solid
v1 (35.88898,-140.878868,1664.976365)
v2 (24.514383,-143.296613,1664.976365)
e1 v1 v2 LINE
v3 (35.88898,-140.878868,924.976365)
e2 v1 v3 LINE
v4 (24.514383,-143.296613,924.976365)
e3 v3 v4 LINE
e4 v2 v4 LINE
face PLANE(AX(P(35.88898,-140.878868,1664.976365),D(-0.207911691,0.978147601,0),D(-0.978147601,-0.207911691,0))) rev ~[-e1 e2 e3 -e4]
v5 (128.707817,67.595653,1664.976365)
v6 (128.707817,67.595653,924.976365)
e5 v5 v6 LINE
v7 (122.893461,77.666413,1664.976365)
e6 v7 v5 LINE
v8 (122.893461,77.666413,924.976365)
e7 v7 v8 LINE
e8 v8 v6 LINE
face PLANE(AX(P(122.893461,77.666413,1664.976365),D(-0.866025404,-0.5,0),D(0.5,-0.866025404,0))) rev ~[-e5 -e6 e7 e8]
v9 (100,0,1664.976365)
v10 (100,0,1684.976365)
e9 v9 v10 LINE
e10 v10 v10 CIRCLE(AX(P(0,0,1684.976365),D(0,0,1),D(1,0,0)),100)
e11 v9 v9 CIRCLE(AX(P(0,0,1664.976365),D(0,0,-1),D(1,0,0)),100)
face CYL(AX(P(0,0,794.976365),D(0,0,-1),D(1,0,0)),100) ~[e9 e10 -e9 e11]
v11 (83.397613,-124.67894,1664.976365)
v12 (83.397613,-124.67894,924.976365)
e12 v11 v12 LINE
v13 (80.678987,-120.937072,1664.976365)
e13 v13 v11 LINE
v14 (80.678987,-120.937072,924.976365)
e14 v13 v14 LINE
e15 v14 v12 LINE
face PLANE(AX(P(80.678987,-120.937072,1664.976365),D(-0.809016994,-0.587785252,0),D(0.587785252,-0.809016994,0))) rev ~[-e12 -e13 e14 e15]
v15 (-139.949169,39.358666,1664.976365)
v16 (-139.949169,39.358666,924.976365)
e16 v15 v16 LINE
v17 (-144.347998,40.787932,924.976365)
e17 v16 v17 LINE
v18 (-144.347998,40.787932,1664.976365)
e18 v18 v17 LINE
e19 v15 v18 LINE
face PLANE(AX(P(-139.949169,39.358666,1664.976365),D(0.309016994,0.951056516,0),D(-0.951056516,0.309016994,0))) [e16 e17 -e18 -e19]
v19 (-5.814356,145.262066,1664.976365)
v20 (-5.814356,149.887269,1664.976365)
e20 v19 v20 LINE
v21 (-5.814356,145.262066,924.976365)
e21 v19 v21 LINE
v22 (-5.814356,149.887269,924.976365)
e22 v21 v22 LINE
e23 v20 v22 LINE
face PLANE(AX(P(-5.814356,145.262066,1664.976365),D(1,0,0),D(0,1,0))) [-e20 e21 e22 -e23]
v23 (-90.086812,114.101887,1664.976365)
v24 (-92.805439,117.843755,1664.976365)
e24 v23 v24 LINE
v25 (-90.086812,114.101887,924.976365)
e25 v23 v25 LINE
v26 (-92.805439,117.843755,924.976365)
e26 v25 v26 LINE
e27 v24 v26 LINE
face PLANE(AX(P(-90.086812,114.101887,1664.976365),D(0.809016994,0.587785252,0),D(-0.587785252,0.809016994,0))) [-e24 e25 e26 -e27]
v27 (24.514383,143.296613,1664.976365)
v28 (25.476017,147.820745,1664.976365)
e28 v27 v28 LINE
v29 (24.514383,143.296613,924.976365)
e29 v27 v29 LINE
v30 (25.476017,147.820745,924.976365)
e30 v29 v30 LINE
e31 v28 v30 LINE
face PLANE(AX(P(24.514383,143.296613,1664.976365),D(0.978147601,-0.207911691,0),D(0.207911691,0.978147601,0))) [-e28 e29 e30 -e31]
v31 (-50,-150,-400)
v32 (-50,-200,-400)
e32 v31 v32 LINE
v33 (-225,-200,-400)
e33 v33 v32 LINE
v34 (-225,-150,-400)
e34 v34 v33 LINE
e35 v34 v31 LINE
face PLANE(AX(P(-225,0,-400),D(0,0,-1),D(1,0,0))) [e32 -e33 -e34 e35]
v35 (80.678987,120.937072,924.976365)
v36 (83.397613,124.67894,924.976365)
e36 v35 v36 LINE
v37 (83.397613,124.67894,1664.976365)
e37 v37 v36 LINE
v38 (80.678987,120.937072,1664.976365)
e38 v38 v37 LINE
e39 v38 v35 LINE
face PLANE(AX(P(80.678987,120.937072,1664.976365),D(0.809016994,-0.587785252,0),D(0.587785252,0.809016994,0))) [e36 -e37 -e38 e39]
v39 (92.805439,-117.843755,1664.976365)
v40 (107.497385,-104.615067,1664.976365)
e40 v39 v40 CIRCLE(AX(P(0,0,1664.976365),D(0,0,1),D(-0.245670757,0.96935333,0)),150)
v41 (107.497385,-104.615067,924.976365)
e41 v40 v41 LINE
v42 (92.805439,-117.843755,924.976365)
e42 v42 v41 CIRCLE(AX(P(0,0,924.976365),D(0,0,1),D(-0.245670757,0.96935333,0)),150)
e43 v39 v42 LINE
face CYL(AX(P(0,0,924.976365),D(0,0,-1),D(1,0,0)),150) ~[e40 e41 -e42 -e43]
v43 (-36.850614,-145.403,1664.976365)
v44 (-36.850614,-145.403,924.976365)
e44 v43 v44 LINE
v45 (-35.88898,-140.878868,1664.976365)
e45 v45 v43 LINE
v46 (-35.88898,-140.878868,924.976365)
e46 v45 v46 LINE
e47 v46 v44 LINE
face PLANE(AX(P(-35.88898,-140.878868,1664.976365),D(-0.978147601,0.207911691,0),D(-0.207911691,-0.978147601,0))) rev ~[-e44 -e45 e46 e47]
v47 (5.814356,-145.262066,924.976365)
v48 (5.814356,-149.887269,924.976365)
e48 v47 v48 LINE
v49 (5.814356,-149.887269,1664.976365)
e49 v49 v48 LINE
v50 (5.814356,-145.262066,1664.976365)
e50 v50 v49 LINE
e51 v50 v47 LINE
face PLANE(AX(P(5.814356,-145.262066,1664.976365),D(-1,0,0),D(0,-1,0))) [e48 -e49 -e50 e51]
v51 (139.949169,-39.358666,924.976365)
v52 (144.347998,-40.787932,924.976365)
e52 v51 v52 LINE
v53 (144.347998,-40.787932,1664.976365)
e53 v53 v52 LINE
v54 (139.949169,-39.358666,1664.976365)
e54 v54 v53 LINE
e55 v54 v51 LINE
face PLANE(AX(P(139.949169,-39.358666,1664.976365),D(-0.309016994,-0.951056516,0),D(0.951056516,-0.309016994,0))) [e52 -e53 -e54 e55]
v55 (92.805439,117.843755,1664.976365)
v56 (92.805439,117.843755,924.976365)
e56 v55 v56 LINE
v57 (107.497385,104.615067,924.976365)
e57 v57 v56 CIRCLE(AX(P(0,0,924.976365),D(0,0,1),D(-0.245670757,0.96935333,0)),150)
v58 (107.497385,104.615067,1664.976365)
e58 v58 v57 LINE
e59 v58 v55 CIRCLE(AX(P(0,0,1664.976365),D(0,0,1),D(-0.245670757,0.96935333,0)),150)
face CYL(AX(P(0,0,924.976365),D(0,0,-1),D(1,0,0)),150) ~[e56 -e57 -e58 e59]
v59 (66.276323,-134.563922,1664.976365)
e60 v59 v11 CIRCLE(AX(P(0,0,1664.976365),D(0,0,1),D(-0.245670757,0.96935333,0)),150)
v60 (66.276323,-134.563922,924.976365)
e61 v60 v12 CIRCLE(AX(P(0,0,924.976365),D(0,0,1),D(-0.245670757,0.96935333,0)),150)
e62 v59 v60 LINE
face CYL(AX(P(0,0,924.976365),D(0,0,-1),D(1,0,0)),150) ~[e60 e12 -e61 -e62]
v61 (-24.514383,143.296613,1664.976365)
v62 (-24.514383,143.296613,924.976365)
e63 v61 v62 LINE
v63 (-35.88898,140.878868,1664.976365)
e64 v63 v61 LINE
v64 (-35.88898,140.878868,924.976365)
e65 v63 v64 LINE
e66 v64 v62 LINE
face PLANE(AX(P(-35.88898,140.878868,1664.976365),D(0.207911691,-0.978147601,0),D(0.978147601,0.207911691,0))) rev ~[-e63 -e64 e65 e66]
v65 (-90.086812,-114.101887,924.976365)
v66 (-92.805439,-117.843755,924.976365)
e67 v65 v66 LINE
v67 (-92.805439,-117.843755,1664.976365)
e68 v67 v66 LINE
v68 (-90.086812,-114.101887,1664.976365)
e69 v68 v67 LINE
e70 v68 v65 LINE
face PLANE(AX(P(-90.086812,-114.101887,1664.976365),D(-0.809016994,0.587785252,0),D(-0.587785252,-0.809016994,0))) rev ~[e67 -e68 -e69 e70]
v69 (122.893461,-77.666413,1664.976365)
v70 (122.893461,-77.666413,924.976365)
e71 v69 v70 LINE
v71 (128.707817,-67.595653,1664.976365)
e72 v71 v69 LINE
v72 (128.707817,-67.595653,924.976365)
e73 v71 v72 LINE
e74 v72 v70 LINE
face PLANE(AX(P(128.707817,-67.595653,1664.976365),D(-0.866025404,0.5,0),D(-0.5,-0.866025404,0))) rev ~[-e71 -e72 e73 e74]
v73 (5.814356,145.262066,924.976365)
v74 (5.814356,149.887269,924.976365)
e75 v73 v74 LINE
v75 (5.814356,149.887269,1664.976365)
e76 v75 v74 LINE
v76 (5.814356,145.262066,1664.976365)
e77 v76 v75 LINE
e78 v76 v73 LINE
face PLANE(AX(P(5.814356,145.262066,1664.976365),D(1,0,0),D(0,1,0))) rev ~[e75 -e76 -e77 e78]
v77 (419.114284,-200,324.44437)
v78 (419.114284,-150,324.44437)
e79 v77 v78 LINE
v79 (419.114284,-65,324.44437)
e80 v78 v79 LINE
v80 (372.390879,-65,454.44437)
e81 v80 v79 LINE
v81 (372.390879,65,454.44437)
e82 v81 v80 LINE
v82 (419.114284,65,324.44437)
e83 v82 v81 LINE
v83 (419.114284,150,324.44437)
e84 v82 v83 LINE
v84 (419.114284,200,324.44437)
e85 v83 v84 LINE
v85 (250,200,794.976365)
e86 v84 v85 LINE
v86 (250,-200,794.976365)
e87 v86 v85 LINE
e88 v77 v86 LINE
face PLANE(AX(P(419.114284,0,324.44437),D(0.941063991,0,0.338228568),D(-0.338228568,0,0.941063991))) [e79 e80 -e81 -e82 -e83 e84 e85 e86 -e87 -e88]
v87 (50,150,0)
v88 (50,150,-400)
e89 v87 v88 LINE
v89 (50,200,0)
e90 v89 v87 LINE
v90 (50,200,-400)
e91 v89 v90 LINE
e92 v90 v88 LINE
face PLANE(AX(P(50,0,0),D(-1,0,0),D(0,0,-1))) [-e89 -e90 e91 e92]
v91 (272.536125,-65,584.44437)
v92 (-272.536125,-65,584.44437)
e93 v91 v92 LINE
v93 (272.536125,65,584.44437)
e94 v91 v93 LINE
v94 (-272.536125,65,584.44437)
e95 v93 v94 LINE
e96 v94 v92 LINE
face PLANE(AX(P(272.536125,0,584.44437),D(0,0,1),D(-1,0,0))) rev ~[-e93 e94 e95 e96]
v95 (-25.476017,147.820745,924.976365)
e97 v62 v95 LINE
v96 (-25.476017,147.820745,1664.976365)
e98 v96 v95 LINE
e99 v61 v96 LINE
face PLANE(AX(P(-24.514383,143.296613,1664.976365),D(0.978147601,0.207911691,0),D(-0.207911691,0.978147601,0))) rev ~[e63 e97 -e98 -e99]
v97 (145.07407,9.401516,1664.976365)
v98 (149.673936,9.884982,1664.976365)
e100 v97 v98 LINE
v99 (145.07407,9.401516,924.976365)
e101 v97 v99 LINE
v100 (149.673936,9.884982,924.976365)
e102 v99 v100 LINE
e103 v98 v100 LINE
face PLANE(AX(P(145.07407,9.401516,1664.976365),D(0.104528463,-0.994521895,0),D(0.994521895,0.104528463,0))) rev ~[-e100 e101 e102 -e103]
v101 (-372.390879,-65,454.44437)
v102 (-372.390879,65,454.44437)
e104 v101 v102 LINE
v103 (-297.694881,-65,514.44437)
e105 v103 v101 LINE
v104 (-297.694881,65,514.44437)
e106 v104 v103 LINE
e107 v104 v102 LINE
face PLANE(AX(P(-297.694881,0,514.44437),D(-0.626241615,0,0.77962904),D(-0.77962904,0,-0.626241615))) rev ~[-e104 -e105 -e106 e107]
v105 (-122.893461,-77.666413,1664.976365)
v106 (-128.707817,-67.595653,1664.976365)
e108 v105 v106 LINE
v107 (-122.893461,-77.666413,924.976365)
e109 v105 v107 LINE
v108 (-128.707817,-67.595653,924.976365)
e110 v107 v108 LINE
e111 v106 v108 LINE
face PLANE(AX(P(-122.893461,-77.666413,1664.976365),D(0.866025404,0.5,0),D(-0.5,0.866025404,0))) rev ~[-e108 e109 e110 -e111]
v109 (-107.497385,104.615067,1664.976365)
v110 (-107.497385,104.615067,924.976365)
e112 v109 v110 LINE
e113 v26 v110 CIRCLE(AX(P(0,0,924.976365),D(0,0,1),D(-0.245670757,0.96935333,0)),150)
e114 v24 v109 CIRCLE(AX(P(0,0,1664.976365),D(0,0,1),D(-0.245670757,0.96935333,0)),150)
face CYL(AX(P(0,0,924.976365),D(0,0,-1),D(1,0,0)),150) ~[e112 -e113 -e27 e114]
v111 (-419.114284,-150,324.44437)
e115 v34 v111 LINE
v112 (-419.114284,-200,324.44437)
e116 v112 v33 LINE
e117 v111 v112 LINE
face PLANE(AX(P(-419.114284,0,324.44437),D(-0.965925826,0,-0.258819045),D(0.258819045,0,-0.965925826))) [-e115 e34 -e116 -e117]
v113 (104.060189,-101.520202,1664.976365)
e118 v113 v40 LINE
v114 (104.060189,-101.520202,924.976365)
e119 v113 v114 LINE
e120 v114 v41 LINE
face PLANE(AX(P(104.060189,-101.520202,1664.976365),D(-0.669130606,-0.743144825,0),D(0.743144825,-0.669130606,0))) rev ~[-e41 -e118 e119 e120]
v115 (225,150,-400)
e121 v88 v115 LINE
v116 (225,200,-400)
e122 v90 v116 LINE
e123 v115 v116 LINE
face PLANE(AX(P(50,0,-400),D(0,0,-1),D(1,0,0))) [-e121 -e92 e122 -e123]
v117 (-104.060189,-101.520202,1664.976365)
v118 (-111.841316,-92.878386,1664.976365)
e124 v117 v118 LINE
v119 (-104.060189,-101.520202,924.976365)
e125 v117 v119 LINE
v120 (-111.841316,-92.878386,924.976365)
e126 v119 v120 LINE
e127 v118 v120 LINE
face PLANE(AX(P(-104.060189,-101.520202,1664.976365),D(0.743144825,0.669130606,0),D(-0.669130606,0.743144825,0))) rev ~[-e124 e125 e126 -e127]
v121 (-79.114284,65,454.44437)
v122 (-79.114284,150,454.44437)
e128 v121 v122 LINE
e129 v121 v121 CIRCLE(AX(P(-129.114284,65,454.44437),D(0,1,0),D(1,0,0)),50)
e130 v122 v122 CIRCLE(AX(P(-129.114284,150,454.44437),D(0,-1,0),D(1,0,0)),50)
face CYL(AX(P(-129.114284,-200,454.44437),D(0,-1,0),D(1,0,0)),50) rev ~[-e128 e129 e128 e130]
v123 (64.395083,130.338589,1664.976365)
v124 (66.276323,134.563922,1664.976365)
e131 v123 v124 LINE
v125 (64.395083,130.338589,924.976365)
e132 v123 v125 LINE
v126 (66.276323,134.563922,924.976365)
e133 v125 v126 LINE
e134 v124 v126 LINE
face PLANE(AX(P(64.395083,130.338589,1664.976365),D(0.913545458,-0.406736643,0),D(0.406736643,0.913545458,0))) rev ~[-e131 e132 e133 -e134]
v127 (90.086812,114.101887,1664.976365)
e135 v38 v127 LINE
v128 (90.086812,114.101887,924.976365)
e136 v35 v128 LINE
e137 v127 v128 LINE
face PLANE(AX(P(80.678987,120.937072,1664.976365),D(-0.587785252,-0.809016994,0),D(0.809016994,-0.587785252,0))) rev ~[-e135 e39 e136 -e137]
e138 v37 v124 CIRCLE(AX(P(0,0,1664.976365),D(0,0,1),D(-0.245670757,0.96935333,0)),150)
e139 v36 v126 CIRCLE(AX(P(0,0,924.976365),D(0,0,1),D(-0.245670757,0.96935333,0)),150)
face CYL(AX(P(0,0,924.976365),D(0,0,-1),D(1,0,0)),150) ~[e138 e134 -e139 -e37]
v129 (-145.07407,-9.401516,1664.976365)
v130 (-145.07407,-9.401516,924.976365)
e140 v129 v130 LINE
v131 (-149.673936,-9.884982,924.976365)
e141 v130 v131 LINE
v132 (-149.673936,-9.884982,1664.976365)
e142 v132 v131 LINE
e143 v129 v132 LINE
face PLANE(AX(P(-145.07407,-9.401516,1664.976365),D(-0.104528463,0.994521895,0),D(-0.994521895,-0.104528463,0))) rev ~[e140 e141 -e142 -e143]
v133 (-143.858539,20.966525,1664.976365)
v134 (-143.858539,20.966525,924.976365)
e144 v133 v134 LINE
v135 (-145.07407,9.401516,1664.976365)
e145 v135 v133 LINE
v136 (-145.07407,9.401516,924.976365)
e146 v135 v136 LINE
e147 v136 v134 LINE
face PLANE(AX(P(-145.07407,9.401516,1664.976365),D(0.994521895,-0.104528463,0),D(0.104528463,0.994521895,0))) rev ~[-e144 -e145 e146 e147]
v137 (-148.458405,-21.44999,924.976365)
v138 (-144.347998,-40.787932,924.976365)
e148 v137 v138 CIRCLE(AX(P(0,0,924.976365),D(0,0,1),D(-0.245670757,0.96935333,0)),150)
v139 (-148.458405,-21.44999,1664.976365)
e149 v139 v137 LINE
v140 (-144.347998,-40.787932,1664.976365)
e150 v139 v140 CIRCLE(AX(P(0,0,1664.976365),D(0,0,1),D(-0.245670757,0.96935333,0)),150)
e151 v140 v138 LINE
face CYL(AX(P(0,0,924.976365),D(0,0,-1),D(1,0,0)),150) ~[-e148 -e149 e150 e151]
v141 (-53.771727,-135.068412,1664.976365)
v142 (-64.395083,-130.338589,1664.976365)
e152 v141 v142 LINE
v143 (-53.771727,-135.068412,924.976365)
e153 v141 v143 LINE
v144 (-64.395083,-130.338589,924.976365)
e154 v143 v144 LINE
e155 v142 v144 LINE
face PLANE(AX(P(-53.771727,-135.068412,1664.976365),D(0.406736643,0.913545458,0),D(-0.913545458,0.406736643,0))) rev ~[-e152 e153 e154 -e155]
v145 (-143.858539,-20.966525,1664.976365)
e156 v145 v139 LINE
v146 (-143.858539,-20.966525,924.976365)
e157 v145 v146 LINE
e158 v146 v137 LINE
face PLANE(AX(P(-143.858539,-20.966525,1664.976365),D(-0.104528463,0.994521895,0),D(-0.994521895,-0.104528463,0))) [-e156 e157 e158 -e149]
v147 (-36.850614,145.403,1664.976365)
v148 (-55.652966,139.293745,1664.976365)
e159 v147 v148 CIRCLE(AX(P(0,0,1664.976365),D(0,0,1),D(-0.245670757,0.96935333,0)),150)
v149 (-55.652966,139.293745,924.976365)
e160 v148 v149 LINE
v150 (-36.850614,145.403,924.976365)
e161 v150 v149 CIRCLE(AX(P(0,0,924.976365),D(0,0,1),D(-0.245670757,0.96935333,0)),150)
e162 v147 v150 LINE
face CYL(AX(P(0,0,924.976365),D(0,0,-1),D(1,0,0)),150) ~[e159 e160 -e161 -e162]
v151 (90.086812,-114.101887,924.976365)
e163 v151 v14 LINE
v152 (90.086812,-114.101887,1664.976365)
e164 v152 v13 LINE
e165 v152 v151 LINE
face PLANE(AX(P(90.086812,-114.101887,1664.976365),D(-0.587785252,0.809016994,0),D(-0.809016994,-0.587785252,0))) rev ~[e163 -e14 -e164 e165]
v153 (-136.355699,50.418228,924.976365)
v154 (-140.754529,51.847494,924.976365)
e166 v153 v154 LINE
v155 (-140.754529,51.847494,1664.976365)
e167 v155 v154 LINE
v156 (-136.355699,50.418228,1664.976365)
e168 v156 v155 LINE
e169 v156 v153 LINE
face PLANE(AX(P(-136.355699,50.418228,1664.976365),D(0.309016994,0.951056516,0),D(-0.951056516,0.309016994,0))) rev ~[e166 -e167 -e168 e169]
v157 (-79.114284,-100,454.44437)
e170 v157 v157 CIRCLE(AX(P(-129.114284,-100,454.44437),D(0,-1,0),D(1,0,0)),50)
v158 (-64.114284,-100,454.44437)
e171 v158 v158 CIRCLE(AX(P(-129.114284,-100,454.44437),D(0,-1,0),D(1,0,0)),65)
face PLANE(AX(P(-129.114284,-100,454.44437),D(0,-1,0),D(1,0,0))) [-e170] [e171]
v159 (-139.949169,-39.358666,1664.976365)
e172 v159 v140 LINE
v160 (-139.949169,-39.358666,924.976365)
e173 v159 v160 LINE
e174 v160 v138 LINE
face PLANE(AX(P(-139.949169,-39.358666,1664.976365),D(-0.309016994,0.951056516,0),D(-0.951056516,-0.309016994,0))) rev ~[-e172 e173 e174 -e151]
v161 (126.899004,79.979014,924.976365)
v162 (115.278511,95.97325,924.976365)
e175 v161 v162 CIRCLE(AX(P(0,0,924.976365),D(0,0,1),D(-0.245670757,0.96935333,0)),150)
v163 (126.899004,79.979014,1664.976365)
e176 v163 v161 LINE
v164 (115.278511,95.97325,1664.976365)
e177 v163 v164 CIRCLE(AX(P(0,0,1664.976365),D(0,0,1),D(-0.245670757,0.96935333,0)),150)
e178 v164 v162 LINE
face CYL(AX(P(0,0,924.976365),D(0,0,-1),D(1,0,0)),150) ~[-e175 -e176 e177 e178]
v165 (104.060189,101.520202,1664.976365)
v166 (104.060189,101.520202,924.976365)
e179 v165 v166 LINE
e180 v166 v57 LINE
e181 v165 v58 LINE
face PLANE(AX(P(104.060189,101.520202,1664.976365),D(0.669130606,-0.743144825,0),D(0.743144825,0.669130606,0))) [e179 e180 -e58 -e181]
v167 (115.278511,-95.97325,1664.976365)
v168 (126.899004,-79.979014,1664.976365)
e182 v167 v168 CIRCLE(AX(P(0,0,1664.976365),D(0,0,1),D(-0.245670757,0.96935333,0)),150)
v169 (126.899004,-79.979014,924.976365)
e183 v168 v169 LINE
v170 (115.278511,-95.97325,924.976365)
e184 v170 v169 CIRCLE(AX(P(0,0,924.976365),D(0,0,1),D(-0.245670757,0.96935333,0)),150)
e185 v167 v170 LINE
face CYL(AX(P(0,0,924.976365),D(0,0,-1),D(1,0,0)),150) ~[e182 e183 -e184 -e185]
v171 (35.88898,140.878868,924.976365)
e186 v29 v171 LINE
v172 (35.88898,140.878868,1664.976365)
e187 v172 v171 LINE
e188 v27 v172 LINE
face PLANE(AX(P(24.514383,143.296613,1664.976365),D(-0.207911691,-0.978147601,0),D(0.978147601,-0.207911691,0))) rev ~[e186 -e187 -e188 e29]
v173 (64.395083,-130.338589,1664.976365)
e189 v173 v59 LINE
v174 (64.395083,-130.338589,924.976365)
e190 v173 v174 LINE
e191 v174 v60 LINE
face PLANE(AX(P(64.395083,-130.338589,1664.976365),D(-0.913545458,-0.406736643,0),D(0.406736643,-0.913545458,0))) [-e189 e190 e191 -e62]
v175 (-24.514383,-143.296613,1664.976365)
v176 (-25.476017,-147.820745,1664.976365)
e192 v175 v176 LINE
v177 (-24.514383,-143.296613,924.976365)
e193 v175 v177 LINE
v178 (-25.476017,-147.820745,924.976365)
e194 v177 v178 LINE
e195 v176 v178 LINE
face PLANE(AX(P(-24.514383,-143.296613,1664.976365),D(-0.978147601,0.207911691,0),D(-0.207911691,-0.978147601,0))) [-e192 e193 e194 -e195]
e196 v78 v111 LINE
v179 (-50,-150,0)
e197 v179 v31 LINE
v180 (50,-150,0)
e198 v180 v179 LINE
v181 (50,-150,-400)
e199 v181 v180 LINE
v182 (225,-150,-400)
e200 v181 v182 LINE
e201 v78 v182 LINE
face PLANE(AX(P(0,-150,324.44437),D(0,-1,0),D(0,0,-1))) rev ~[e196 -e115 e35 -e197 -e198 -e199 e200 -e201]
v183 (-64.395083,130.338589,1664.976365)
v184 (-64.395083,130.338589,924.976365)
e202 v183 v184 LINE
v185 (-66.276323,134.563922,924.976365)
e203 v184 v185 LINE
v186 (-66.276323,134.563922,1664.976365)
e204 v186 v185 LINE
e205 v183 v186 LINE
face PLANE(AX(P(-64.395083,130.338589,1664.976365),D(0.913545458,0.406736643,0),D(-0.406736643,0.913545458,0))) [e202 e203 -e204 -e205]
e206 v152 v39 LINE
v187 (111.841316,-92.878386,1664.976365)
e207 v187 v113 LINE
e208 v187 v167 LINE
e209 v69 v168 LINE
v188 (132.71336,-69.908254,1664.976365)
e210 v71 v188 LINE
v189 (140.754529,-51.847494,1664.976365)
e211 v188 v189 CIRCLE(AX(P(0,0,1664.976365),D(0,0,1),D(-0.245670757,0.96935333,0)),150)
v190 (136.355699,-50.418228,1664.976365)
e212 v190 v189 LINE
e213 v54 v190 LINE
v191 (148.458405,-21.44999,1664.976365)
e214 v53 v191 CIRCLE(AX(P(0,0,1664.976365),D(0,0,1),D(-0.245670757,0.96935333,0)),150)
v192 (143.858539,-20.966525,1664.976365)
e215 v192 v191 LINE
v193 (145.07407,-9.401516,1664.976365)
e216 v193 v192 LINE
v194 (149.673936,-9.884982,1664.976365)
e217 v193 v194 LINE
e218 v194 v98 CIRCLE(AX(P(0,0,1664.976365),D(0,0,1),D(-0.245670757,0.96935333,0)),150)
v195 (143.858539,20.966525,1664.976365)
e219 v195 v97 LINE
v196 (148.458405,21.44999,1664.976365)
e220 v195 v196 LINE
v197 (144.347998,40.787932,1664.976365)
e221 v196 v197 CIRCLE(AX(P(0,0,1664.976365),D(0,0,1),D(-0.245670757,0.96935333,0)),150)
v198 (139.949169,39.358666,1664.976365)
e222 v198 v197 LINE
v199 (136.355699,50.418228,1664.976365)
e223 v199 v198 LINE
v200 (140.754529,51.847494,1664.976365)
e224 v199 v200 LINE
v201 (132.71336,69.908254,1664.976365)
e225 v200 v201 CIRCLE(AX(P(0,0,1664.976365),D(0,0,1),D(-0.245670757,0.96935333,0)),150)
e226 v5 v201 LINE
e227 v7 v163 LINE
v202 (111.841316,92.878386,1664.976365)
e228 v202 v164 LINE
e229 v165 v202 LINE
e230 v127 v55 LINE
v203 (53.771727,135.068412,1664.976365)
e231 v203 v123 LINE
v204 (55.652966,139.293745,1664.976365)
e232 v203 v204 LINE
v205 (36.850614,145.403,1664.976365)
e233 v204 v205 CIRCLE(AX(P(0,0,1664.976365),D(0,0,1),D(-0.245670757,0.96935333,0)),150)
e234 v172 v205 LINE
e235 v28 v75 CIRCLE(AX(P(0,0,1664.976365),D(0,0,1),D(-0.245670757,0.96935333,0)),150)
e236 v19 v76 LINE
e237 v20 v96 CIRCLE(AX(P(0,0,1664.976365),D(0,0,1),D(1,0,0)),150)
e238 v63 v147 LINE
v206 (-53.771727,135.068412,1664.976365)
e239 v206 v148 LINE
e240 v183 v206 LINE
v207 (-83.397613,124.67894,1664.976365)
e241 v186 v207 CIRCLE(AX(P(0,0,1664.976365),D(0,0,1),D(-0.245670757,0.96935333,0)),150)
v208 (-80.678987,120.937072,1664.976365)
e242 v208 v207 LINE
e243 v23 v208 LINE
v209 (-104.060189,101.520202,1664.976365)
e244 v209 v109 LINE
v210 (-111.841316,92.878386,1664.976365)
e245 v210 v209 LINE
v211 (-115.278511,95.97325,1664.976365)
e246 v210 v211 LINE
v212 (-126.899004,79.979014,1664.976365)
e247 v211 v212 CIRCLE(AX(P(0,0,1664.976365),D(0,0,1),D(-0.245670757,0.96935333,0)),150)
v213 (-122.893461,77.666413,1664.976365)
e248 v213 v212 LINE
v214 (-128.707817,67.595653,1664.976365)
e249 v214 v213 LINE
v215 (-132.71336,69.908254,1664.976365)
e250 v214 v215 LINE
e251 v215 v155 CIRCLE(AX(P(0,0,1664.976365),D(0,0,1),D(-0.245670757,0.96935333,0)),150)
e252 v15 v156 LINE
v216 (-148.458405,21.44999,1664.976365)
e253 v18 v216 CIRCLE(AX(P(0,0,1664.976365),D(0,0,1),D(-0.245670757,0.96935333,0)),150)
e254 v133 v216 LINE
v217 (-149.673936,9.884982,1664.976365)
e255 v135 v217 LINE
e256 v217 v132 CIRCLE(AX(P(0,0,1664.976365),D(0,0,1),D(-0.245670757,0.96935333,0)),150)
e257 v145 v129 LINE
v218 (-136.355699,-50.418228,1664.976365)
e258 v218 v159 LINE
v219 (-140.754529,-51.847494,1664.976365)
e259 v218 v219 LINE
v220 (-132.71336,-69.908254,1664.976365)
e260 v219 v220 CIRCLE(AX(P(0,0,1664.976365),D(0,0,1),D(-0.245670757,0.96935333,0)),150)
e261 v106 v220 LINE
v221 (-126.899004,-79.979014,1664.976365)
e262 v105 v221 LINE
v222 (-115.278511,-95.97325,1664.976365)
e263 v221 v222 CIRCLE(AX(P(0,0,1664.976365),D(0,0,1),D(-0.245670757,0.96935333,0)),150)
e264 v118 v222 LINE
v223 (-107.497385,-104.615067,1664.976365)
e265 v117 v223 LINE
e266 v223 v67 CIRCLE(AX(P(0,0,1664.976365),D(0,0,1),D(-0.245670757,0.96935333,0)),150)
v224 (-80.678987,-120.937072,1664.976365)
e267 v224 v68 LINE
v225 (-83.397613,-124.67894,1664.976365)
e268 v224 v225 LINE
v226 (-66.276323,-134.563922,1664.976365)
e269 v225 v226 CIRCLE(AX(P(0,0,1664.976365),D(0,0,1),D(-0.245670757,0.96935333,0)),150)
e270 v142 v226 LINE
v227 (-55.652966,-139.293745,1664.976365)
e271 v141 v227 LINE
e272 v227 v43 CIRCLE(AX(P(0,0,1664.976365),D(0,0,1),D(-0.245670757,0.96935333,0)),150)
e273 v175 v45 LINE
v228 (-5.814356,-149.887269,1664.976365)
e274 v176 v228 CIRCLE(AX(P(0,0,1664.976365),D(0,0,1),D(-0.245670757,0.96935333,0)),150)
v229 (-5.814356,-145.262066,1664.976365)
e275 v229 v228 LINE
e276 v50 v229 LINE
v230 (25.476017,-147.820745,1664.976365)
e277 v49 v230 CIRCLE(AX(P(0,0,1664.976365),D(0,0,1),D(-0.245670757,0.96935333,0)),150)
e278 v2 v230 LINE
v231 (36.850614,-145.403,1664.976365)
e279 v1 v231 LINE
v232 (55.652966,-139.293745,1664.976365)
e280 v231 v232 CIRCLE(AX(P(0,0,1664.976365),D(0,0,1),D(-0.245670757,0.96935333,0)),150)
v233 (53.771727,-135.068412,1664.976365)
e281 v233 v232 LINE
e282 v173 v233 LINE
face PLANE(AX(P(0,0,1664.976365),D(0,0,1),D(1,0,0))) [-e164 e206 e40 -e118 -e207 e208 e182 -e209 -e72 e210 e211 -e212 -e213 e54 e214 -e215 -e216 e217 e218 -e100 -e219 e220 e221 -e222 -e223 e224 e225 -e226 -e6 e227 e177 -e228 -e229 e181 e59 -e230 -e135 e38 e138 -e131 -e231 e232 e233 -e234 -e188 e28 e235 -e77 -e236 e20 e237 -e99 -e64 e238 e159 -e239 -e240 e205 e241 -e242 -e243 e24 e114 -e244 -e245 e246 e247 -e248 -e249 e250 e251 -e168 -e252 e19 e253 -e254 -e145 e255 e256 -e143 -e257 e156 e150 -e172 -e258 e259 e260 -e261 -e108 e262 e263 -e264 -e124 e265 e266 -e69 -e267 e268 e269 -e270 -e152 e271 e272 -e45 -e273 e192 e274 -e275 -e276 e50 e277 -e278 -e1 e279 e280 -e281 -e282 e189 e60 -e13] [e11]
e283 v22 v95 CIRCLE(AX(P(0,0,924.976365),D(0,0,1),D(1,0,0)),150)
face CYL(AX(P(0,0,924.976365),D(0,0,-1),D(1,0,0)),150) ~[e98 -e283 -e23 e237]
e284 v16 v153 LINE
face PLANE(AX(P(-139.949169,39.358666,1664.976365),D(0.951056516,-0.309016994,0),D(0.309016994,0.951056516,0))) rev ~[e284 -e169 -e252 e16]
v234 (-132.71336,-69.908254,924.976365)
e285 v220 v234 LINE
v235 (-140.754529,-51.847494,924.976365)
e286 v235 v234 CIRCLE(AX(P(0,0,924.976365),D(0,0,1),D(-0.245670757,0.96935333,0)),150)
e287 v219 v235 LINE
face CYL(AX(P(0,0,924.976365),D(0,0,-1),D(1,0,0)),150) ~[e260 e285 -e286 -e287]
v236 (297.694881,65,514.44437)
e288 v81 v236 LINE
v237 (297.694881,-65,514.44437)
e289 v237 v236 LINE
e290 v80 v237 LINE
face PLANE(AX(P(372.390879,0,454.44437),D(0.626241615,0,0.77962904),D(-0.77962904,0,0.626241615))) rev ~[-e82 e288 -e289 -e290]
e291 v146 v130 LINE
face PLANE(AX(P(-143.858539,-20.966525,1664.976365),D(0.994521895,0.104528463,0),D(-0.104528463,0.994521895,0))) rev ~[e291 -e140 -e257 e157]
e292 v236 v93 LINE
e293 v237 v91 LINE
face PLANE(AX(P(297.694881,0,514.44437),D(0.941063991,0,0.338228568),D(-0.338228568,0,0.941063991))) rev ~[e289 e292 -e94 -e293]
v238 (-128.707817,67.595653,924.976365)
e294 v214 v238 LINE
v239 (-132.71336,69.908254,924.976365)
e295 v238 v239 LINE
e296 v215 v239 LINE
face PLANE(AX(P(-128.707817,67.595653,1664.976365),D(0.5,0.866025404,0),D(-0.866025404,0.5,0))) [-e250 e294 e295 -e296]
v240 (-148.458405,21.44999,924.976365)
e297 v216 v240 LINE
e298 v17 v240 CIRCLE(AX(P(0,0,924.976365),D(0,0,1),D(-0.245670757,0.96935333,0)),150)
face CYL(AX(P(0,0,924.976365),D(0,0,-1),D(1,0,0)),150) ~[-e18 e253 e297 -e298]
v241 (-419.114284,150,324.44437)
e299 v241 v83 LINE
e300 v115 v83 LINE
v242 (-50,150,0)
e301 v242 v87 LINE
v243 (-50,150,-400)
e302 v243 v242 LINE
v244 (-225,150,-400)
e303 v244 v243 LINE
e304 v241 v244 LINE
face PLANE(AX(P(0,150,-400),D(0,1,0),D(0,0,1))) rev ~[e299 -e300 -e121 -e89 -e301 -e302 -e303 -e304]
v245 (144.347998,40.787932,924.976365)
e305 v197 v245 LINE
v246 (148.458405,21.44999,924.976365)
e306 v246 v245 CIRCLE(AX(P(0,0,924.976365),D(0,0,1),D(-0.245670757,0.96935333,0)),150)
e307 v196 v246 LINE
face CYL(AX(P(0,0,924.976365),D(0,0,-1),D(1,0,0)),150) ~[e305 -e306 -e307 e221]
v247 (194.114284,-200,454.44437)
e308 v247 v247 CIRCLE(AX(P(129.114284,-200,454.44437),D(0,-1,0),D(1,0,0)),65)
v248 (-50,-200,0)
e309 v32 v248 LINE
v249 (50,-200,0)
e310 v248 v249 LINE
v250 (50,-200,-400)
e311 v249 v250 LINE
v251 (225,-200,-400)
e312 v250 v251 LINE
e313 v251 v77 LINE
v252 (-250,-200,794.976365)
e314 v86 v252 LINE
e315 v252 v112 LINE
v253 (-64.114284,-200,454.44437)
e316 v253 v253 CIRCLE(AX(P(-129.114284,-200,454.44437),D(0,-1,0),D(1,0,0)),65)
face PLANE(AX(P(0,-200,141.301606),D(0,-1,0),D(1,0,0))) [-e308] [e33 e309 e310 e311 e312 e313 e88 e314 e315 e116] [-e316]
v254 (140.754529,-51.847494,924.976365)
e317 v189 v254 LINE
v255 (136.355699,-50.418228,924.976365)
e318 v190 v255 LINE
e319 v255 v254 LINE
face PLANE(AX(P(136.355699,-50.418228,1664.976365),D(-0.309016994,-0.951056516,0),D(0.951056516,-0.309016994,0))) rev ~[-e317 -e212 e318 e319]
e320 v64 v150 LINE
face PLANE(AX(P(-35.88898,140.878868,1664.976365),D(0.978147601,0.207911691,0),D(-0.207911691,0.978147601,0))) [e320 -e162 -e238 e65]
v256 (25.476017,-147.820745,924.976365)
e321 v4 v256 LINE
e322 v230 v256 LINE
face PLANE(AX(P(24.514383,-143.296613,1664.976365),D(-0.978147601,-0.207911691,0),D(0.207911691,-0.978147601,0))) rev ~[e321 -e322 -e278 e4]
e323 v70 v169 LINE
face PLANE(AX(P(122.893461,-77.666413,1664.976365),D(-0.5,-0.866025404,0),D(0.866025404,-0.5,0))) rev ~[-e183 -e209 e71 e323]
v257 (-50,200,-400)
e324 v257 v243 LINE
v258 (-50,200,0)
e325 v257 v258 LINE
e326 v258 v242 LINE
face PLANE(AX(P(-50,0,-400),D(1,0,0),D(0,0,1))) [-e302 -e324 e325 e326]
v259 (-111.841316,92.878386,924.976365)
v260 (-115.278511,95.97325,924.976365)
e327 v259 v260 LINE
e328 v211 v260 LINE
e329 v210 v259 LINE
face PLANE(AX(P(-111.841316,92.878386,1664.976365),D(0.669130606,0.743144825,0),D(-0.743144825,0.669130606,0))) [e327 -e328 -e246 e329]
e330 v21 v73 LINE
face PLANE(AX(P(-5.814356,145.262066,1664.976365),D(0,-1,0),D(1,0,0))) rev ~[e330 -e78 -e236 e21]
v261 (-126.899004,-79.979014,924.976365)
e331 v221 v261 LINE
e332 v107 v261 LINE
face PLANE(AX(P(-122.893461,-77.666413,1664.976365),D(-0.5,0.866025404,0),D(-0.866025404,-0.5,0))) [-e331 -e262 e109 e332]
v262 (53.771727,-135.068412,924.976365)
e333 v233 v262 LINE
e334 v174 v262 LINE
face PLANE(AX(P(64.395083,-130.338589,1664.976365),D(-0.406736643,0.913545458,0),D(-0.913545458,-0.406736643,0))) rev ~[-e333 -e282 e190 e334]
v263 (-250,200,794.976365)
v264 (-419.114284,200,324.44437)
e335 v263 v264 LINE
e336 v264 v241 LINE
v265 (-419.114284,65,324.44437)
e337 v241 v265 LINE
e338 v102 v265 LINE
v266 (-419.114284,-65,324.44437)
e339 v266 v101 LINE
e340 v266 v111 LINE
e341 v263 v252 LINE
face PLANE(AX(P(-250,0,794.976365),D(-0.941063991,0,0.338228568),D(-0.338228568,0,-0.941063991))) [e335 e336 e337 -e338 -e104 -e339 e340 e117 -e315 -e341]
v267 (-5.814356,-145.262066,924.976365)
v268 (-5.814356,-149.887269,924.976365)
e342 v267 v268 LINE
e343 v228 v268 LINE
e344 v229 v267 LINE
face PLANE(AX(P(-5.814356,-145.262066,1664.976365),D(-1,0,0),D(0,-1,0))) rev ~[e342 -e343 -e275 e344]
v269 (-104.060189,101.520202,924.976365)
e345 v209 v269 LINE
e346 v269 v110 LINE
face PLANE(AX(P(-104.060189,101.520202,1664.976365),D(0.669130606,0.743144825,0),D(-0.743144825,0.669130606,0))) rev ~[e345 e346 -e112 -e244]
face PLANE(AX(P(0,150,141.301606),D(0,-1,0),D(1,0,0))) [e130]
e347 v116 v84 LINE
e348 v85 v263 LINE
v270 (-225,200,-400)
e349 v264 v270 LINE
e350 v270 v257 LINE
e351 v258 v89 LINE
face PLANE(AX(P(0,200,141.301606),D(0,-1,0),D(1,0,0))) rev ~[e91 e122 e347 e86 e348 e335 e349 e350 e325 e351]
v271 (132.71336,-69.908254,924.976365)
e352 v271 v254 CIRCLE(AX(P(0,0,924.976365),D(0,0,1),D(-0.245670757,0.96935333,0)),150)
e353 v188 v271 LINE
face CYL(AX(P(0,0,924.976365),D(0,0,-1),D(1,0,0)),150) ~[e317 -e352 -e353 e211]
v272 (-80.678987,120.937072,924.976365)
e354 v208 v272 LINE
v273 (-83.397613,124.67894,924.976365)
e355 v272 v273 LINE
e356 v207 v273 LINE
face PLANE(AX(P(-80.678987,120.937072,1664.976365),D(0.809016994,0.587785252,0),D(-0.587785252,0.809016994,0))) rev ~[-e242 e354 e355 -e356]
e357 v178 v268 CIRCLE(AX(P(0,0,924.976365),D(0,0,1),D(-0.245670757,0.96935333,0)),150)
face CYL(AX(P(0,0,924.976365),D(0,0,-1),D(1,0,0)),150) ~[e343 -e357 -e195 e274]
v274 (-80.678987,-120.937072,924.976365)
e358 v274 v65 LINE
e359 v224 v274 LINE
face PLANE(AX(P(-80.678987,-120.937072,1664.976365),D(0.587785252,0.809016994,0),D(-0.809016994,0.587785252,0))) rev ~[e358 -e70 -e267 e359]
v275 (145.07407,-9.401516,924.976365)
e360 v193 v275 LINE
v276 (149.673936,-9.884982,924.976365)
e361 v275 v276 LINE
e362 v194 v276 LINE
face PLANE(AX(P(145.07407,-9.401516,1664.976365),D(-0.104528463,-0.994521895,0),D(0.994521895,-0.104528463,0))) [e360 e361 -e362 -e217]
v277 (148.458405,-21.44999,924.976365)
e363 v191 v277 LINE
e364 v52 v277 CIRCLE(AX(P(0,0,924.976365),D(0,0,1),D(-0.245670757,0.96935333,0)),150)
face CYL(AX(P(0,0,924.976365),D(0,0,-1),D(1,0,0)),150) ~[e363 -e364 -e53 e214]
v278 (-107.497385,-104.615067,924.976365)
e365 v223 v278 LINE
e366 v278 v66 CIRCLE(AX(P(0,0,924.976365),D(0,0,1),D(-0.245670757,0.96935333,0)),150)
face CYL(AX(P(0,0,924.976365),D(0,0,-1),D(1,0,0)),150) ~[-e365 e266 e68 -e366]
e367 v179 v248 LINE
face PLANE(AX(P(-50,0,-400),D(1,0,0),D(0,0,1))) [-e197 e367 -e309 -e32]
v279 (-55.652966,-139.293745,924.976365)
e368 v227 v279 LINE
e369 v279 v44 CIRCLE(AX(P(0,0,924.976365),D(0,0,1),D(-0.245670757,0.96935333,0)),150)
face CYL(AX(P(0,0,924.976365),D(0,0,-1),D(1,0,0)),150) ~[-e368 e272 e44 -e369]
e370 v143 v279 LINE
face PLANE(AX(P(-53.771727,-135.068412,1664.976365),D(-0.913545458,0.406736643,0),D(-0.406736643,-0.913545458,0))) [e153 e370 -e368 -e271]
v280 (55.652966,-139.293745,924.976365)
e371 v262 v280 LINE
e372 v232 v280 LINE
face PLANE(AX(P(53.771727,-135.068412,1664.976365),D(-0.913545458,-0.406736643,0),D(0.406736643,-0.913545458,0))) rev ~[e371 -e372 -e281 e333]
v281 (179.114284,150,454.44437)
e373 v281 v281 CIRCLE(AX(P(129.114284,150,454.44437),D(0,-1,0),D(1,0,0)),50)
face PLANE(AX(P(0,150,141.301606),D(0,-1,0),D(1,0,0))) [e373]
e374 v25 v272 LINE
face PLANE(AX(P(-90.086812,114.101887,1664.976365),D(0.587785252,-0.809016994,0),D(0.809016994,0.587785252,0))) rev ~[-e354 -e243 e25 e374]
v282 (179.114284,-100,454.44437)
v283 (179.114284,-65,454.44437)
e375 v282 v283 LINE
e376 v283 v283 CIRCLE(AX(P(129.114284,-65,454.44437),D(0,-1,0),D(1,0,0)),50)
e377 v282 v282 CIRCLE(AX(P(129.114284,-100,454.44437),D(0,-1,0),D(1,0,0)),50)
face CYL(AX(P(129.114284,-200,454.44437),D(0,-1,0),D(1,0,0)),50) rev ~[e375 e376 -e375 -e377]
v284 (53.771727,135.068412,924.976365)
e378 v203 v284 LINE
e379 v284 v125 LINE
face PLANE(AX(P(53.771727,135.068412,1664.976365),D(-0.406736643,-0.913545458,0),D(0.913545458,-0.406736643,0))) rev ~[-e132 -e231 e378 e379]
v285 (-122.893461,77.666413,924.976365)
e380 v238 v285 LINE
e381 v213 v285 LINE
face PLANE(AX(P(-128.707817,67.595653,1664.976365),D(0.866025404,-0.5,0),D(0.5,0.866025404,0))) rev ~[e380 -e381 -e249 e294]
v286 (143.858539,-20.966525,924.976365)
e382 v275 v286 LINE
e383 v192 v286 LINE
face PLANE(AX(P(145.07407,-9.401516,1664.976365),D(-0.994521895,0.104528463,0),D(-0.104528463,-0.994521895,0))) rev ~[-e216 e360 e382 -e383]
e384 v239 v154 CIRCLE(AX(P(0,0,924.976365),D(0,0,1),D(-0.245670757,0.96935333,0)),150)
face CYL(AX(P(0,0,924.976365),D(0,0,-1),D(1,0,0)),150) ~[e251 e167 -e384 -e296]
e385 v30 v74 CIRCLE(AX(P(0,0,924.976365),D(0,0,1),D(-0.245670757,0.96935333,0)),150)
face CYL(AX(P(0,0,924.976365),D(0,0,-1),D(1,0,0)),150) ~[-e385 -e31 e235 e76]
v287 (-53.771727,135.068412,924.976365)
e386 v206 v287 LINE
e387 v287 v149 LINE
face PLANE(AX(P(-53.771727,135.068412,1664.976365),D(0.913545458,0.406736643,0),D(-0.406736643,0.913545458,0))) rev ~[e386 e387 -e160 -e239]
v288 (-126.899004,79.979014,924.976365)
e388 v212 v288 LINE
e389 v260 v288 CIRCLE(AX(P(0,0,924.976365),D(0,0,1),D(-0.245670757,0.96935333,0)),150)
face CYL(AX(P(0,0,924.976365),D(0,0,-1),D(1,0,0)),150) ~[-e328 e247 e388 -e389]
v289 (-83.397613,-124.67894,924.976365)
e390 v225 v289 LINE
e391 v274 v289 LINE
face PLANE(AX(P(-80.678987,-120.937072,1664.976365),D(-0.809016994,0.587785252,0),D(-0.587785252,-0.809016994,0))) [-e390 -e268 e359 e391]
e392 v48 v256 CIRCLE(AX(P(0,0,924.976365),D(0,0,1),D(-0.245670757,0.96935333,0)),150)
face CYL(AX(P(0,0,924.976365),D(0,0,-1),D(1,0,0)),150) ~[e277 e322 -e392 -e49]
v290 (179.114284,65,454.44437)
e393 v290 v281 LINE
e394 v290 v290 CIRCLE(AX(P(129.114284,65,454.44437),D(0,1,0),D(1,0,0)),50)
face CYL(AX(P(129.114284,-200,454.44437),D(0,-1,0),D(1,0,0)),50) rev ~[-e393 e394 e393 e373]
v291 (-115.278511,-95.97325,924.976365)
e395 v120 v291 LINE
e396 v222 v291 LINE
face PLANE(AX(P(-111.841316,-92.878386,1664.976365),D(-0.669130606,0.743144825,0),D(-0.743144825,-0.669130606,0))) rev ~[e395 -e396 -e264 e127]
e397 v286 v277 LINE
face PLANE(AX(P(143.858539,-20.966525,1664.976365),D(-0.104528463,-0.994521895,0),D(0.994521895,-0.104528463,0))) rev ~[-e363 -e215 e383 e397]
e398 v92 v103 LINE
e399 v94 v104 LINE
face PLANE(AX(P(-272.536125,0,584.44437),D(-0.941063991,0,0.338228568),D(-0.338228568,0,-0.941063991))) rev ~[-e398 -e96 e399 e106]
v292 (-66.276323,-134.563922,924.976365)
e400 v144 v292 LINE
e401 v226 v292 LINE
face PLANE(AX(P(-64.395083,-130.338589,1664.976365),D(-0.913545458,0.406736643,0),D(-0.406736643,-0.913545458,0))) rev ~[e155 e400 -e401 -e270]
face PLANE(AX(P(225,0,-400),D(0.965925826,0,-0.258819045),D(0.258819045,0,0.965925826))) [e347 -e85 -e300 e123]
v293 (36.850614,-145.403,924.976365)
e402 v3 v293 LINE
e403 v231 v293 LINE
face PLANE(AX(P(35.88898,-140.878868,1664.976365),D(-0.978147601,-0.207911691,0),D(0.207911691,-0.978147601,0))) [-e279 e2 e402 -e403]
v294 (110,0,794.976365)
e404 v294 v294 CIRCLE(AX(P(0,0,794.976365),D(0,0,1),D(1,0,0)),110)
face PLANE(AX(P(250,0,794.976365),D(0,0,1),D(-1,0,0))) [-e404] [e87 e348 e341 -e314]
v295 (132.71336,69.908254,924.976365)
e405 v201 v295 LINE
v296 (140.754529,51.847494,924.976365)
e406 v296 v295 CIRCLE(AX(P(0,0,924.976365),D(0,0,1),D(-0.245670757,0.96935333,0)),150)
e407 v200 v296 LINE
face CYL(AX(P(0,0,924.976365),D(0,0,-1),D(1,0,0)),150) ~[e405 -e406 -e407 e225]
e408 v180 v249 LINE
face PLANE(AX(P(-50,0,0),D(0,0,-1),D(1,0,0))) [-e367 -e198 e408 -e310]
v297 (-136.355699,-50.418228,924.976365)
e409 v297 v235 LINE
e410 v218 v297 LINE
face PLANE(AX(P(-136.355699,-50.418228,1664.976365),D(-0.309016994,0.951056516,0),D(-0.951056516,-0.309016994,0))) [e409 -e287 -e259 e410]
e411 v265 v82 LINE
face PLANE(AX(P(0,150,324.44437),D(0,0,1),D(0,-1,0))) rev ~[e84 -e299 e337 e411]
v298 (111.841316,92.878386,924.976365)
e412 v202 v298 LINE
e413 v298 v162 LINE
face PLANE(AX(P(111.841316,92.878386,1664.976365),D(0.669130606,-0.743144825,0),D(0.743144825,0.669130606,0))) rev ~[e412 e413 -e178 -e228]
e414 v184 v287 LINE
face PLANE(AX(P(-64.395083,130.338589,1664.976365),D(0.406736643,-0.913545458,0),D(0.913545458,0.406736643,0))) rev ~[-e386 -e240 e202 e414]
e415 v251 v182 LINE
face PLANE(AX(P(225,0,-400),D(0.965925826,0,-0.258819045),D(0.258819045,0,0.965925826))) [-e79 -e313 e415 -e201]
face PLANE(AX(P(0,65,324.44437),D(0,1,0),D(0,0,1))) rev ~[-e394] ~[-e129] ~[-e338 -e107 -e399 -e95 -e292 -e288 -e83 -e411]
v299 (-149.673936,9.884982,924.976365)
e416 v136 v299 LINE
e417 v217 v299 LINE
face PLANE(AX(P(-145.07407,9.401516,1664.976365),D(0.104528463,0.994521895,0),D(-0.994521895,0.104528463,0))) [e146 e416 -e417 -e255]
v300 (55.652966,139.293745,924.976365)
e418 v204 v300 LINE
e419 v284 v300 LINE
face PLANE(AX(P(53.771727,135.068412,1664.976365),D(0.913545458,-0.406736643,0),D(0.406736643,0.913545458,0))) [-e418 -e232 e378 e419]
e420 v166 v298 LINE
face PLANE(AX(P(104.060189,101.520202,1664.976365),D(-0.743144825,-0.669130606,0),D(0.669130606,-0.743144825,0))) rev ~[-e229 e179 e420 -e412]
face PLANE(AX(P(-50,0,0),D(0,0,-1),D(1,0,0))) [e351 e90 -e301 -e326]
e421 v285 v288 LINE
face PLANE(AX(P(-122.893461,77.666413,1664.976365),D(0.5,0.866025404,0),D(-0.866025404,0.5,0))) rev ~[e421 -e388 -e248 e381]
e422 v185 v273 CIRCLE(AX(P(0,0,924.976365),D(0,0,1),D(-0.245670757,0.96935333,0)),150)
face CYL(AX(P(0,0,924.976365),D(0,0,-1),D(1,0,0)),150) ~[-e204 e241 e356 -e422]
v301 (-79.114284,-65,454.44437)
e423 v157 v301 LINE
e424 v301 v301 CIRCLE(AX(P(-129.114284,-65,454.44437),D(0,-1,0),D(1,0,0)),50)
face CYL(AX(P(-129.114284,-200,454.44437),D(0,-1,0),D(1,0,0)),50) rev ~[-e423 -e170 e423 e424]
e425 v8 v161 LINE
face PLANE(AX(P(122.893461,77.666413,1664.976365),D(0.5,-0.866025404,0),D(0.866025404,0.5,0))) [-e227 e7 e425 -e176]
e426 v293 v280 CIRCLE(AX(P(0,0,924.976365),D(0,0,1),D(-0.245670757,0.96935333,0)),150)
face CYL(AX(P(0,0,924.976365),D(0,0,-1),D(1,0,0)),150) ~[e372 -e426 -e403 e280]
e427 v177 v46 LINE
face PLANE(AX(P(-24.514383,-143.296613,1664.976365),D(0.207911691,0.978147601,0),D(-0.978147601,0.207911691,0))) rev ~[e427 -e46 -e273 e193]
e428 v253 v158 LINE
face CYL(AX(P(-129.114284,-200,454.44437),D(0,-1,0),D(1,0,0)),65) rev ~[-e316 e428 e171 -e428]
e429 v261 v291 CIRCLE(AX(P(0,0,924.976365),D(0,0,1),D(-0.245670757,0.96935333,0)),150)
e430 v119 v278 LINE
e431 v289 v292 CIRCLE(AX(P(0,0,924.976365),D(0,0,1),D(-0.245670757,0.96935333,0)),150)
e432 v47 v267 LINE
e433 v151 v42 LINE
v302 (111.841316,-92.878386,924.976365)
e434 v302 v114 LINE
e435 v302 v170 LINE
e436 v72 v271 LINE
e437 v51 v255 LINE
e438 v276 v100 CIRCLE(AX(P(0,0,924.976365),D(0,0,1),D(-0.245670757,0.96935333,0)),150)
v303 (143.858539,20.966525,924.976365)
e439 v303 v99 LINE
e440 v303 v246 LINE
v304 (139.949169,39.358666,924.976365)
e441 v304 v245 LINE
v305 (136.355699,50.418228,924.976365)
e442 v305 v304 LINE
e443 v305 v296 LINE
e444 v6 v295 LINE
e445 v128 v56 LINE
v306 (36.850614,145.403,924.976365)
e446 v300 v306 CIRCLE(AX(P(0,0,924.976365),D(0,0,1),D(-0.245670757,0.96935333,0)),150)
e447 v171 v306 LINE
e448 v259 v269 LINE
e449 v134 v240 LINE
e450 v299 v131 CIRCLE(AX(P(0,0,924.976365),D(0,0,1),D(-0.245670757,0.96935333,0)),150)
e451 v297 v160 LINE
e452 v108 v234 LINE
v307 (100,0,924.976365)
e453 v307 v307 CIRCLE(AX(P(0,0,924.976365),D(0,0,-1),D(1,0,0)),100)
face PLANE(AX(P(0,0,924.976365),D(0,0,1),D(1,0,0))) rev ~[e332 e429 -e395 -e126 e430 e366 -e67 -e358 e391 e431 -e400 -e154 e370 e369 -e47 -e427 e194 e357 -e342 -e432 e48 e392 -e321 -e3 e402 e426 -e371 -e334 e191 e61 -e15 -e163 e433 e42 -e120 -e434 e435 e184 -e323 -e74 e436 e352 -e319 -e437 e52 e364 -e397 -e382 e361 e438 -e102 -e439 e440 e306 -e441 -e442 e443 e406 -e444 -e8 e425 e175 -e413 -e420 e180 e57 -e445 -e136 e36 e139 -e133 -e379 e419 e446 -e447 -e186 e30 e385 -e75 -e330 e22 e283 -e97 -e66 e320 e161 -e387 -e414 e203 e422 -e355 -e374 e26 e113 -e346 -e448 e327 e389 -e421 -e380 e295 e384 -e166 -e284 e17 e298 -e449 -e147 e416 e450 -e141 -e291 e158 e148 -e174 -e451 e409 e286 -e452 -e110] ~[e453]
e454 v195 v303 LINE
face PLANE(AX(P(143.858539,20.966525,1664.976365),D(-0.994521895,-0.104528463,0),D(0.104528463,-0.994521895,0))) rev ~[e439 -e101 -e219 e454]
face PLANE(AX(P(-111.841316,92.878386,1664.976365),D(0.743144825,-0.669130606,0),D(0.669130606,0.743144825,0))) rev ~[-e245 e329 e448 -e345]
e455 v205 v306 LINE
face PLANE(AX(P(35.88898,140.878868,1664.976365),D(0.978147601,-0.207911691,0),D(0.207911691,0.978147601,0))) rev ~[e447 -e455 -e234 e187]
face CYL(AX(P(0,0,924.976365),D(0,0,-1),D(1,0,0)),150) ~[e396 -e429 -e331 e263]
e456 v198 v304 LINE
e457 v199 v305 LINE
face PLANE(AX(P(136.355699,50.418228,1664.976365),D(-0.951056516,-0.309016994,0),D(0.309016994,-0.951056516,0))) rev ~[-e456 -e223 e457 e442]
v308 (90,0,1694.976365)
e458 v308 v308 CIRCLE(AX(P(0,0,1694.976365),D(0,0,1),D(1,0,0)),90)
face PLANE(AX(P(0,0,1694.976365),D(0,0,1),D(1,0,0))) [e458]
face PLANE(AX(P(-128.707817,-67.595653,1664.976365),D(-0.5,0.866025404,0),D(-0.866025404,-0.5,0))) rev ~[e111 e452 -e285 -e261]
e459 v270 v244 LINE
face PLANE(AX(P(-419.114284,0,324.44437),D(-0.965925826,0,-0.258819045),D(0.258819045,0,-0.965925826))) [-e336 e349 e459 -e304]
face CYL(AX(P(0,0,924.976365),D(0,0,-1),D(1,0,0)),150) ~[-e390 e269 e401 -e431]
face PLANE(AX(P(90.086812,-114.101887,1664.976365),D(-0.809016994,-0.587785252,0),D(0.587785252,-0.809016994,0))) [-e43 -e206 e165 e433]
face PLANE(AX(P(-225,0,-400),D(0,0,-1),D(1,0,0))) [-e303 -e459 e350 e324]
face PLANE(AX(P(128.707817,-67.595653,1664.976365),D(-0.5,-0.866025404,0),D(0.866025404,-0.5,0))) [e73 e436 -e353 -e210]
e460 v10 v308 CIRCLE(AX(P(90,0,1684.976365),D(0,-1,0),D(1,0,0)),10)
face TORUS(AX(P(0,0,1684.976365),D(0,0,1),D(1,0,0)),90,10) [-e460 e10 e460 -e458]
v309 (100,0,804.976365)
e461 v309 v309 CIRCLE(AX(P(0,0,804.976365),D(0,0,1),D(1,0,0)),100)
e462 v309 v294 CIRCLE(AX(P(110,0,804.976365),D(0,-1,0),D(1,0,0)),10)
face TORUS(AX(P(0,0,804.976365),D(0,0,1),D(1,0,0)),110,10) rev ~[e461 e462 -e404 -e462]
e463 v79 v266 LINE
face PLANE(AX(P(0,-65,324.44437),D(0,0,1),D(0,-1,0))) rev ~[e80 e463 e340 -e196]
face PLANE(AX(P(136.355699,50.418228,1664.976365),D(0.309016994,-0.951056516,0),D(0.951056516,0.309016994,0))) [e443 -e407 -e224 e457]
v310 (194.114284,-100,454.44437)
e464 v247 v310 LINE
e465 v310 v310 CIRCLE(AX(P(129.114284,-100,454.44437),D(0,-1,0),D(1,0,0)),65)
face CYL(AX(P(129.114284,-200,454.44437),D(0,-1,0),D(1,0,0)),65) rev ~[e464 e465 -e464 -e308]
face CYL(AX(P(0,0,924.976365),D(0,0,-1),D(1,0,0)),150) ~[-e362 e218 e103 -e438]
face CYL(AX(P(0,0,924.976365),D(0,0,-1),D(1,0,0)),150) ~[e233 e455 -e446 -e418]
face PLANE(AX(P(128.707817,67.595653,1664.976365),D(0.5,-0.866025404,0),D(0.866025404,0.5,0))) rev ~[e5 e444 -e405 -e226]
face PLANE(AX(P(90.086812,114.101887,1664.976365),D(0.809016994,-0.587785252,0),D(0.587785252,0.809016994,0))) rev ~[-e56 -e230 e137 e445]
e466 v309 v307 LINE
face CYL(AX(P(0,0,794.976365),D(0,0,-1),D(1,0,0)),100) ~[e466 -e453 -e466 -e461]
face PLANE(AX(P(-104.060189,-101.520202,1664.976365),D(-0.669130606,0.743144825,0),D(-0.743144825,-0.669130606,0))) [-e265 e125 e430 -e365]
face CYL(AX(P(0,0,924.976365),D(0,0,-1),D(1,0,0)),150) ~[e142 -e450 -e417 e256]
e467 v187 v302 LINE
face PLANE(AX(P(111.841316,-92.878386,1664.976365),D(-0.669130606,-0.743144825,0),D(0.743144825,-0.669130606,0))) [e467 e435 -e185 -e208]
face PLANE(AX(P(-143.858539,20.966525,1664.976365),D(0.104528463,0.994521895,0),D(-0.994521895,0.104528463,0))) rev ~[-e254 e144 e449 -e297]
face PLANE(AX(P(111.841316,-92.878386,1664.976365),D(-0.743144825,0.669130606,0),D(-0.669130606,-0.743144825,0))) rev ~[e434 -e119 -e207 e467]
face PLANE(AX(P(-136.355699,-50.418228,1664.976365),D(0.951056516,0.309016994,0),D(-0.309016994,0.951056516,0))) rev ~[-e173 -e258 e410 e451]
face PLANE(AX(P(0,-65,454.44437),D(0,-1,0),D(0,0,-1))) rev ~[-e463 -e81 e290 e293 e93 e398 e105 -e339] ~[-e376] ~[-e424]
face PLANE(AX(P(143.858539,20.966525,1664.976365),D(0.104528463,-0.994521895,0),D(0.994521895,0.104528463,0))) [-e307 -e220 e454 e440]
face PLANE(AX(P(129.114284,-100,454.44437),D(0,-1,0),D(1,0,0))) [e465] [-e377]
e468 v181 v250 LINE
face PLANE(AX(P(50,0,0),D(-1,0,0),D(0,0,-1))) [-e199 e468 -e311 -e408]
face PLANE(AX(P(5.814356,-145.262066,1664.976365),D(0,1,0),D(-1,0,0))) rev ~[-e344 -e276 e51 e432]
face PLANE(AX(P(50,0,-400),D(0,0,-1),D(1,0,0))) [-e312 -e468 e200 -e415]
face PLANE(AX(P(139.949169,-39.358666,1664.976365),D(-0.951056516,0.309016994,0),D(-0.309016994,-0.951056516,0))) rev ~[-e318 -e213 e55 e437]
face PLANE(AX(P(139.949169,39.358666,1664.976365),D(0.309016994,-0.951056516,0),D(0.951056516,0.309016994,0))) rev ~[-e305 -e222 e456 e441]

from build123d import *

# Parameters (mm, degrees)
F1_DEPTH         = 200
F2_R             = 100
F3_DEPTH         = 900
F5_R             = 150
F6_DEPTH         = 740
F8_DEPTH         = 580
F9_R             = 65
F9_R_2           = 50
F10_DEPTH        = 100
F11_DEPTH        = 350
F13_DEPTH        = 65
F14_R            = 10
F15_W            = 11.6287115961
F15_H            = 9.4758689404
F16_DEPTH        = 740
F16_COPIES_COUNT = 30


# Not quite as in the source:
# - a pattern or mirror of a feature is missing from the dataset's text; its kind, count and spacing are read off the source's solid


with BuildPart() as f1:
    # F0 (on Front) → F1 (new body, symmetric)
    with BuildSketch(Plane.XZ):
        Polygon((250, 794.9763654469), (-250, 794.9763654469), (-419.1142838269, 324.4443697168), (-225, -400), (-50, -400), (-50, 0), (0, 0), (50, 0), (50, -400), (225, -400), (419.1142838269, 324.4443697168), align=None)
    extrude(amount=F1_DEPTH, both=True)

    # F2 (on face) → F3 (join)
    with BuildSketch(Plane.XY.offset(794.9763654469)):
        Circle(F2_R)
    extrude(amount=F3_DEPTH)

    # F5 (on offset) → F6 (join)
    with BuildSketch(Plane.XY.offset(924.9763654469)):
        Circle(F5_R)
    extrude(amount=F6_DEPTH)

    # F7 (on Right) → F8 (cut, symmetric)
    with BuildSketch(Plane.YZ):
        Polygon((-150, 324.4443697168), (-150, -400), (150, -400), (150, 324.4443697168), (65, 324.4443697168), (65, 454.4443697168), (-65, 454.4443697168), (-65, 324.4443697168), align=None)
    extrude(amount=F8_DEPTH, both=True, mode=Mode.SUBTRACT)

    # F9 (on face) → F10 (cut)
    with BuildSketch(Plane.XZ.offset(200)):
        with Locations((-129.1142838269, 454.4443697168)):
            Circle(F9_R)
        with Locations((-129.1142838269, 454.4443697168)):
            Circle(F9_R_2, mode=Mode.SUBTRACT)
        with Locations((129.1142838269, 454.4443697168)):
            Circle(F9_R)
        with Locations((129.1142838269, 454.4443697168)):
            Circle(F9_R_2, mode=Mode.SUBTRACT)
    extrude(amount=-F10_DEPTH, mode=Mode.SUBTRACT)

    # F11 (cut): faces of the model
    f11_faces = [f1.faces().sort_by_distance(p)[0] for p in [
        (-129.1142838269, -200, 454.4443697168),
        (129.1142838269, -200, 454.4443697168),
    ]]
    extrude(f11_faces, amount=-F11_DEPTH, mode=Mode.SUBTRACT)

    # F12 (on Front) → F13 (cut, symmetric)
    with BuildSketch(Plane.XZ):
        Polygon((272.5361245925, 584.4443697168), (-272.5361245925, 584.4443697168), (-297.6948810114, 514.4443697168), (-372.3908790489, 454.4443697168), (-419.1142838269, 324.4443697168), (419.1142838269, 324.4443697168), (372.3908790489, 454.4443697168), (297.6948810114, 514.4443697168), align=None)
    extrude(amount=F13_DEPTH, both=True, mode=Mode.SUBTRACT)

    # F14
    f14_edges = [f1.edges().sort_by_distance(p)[0] for p in [
        (-100, 0, 1694.976365),
        (-100, 0, 794.976365),
    ]]
    fillet(f14_edges, radius=F14_R)

    # F15 (on face) → F16 (cut, through all)
    with BuildSketch(Plane.XY.offset(1664.9763654469)):
        with Locations((0, 150)):
            Rectangle(F15_W, F15_H)
    f16 = extrude(amount=-F16_DEPTH, mode=Mode.SUBTRACT)

    # F16_copies: F16 ×30 about axis
    f16_copies_axis = Axis((0, 0, 0), (0, 0, 1))
    for i in range(1, F16_COPIES_COUNT):
        add(f16.rotate(f16_copies_axis, i * 360 / F16_COPIES_COUNT), mode=Mode.SUBTRACT)


solid = f1.part
